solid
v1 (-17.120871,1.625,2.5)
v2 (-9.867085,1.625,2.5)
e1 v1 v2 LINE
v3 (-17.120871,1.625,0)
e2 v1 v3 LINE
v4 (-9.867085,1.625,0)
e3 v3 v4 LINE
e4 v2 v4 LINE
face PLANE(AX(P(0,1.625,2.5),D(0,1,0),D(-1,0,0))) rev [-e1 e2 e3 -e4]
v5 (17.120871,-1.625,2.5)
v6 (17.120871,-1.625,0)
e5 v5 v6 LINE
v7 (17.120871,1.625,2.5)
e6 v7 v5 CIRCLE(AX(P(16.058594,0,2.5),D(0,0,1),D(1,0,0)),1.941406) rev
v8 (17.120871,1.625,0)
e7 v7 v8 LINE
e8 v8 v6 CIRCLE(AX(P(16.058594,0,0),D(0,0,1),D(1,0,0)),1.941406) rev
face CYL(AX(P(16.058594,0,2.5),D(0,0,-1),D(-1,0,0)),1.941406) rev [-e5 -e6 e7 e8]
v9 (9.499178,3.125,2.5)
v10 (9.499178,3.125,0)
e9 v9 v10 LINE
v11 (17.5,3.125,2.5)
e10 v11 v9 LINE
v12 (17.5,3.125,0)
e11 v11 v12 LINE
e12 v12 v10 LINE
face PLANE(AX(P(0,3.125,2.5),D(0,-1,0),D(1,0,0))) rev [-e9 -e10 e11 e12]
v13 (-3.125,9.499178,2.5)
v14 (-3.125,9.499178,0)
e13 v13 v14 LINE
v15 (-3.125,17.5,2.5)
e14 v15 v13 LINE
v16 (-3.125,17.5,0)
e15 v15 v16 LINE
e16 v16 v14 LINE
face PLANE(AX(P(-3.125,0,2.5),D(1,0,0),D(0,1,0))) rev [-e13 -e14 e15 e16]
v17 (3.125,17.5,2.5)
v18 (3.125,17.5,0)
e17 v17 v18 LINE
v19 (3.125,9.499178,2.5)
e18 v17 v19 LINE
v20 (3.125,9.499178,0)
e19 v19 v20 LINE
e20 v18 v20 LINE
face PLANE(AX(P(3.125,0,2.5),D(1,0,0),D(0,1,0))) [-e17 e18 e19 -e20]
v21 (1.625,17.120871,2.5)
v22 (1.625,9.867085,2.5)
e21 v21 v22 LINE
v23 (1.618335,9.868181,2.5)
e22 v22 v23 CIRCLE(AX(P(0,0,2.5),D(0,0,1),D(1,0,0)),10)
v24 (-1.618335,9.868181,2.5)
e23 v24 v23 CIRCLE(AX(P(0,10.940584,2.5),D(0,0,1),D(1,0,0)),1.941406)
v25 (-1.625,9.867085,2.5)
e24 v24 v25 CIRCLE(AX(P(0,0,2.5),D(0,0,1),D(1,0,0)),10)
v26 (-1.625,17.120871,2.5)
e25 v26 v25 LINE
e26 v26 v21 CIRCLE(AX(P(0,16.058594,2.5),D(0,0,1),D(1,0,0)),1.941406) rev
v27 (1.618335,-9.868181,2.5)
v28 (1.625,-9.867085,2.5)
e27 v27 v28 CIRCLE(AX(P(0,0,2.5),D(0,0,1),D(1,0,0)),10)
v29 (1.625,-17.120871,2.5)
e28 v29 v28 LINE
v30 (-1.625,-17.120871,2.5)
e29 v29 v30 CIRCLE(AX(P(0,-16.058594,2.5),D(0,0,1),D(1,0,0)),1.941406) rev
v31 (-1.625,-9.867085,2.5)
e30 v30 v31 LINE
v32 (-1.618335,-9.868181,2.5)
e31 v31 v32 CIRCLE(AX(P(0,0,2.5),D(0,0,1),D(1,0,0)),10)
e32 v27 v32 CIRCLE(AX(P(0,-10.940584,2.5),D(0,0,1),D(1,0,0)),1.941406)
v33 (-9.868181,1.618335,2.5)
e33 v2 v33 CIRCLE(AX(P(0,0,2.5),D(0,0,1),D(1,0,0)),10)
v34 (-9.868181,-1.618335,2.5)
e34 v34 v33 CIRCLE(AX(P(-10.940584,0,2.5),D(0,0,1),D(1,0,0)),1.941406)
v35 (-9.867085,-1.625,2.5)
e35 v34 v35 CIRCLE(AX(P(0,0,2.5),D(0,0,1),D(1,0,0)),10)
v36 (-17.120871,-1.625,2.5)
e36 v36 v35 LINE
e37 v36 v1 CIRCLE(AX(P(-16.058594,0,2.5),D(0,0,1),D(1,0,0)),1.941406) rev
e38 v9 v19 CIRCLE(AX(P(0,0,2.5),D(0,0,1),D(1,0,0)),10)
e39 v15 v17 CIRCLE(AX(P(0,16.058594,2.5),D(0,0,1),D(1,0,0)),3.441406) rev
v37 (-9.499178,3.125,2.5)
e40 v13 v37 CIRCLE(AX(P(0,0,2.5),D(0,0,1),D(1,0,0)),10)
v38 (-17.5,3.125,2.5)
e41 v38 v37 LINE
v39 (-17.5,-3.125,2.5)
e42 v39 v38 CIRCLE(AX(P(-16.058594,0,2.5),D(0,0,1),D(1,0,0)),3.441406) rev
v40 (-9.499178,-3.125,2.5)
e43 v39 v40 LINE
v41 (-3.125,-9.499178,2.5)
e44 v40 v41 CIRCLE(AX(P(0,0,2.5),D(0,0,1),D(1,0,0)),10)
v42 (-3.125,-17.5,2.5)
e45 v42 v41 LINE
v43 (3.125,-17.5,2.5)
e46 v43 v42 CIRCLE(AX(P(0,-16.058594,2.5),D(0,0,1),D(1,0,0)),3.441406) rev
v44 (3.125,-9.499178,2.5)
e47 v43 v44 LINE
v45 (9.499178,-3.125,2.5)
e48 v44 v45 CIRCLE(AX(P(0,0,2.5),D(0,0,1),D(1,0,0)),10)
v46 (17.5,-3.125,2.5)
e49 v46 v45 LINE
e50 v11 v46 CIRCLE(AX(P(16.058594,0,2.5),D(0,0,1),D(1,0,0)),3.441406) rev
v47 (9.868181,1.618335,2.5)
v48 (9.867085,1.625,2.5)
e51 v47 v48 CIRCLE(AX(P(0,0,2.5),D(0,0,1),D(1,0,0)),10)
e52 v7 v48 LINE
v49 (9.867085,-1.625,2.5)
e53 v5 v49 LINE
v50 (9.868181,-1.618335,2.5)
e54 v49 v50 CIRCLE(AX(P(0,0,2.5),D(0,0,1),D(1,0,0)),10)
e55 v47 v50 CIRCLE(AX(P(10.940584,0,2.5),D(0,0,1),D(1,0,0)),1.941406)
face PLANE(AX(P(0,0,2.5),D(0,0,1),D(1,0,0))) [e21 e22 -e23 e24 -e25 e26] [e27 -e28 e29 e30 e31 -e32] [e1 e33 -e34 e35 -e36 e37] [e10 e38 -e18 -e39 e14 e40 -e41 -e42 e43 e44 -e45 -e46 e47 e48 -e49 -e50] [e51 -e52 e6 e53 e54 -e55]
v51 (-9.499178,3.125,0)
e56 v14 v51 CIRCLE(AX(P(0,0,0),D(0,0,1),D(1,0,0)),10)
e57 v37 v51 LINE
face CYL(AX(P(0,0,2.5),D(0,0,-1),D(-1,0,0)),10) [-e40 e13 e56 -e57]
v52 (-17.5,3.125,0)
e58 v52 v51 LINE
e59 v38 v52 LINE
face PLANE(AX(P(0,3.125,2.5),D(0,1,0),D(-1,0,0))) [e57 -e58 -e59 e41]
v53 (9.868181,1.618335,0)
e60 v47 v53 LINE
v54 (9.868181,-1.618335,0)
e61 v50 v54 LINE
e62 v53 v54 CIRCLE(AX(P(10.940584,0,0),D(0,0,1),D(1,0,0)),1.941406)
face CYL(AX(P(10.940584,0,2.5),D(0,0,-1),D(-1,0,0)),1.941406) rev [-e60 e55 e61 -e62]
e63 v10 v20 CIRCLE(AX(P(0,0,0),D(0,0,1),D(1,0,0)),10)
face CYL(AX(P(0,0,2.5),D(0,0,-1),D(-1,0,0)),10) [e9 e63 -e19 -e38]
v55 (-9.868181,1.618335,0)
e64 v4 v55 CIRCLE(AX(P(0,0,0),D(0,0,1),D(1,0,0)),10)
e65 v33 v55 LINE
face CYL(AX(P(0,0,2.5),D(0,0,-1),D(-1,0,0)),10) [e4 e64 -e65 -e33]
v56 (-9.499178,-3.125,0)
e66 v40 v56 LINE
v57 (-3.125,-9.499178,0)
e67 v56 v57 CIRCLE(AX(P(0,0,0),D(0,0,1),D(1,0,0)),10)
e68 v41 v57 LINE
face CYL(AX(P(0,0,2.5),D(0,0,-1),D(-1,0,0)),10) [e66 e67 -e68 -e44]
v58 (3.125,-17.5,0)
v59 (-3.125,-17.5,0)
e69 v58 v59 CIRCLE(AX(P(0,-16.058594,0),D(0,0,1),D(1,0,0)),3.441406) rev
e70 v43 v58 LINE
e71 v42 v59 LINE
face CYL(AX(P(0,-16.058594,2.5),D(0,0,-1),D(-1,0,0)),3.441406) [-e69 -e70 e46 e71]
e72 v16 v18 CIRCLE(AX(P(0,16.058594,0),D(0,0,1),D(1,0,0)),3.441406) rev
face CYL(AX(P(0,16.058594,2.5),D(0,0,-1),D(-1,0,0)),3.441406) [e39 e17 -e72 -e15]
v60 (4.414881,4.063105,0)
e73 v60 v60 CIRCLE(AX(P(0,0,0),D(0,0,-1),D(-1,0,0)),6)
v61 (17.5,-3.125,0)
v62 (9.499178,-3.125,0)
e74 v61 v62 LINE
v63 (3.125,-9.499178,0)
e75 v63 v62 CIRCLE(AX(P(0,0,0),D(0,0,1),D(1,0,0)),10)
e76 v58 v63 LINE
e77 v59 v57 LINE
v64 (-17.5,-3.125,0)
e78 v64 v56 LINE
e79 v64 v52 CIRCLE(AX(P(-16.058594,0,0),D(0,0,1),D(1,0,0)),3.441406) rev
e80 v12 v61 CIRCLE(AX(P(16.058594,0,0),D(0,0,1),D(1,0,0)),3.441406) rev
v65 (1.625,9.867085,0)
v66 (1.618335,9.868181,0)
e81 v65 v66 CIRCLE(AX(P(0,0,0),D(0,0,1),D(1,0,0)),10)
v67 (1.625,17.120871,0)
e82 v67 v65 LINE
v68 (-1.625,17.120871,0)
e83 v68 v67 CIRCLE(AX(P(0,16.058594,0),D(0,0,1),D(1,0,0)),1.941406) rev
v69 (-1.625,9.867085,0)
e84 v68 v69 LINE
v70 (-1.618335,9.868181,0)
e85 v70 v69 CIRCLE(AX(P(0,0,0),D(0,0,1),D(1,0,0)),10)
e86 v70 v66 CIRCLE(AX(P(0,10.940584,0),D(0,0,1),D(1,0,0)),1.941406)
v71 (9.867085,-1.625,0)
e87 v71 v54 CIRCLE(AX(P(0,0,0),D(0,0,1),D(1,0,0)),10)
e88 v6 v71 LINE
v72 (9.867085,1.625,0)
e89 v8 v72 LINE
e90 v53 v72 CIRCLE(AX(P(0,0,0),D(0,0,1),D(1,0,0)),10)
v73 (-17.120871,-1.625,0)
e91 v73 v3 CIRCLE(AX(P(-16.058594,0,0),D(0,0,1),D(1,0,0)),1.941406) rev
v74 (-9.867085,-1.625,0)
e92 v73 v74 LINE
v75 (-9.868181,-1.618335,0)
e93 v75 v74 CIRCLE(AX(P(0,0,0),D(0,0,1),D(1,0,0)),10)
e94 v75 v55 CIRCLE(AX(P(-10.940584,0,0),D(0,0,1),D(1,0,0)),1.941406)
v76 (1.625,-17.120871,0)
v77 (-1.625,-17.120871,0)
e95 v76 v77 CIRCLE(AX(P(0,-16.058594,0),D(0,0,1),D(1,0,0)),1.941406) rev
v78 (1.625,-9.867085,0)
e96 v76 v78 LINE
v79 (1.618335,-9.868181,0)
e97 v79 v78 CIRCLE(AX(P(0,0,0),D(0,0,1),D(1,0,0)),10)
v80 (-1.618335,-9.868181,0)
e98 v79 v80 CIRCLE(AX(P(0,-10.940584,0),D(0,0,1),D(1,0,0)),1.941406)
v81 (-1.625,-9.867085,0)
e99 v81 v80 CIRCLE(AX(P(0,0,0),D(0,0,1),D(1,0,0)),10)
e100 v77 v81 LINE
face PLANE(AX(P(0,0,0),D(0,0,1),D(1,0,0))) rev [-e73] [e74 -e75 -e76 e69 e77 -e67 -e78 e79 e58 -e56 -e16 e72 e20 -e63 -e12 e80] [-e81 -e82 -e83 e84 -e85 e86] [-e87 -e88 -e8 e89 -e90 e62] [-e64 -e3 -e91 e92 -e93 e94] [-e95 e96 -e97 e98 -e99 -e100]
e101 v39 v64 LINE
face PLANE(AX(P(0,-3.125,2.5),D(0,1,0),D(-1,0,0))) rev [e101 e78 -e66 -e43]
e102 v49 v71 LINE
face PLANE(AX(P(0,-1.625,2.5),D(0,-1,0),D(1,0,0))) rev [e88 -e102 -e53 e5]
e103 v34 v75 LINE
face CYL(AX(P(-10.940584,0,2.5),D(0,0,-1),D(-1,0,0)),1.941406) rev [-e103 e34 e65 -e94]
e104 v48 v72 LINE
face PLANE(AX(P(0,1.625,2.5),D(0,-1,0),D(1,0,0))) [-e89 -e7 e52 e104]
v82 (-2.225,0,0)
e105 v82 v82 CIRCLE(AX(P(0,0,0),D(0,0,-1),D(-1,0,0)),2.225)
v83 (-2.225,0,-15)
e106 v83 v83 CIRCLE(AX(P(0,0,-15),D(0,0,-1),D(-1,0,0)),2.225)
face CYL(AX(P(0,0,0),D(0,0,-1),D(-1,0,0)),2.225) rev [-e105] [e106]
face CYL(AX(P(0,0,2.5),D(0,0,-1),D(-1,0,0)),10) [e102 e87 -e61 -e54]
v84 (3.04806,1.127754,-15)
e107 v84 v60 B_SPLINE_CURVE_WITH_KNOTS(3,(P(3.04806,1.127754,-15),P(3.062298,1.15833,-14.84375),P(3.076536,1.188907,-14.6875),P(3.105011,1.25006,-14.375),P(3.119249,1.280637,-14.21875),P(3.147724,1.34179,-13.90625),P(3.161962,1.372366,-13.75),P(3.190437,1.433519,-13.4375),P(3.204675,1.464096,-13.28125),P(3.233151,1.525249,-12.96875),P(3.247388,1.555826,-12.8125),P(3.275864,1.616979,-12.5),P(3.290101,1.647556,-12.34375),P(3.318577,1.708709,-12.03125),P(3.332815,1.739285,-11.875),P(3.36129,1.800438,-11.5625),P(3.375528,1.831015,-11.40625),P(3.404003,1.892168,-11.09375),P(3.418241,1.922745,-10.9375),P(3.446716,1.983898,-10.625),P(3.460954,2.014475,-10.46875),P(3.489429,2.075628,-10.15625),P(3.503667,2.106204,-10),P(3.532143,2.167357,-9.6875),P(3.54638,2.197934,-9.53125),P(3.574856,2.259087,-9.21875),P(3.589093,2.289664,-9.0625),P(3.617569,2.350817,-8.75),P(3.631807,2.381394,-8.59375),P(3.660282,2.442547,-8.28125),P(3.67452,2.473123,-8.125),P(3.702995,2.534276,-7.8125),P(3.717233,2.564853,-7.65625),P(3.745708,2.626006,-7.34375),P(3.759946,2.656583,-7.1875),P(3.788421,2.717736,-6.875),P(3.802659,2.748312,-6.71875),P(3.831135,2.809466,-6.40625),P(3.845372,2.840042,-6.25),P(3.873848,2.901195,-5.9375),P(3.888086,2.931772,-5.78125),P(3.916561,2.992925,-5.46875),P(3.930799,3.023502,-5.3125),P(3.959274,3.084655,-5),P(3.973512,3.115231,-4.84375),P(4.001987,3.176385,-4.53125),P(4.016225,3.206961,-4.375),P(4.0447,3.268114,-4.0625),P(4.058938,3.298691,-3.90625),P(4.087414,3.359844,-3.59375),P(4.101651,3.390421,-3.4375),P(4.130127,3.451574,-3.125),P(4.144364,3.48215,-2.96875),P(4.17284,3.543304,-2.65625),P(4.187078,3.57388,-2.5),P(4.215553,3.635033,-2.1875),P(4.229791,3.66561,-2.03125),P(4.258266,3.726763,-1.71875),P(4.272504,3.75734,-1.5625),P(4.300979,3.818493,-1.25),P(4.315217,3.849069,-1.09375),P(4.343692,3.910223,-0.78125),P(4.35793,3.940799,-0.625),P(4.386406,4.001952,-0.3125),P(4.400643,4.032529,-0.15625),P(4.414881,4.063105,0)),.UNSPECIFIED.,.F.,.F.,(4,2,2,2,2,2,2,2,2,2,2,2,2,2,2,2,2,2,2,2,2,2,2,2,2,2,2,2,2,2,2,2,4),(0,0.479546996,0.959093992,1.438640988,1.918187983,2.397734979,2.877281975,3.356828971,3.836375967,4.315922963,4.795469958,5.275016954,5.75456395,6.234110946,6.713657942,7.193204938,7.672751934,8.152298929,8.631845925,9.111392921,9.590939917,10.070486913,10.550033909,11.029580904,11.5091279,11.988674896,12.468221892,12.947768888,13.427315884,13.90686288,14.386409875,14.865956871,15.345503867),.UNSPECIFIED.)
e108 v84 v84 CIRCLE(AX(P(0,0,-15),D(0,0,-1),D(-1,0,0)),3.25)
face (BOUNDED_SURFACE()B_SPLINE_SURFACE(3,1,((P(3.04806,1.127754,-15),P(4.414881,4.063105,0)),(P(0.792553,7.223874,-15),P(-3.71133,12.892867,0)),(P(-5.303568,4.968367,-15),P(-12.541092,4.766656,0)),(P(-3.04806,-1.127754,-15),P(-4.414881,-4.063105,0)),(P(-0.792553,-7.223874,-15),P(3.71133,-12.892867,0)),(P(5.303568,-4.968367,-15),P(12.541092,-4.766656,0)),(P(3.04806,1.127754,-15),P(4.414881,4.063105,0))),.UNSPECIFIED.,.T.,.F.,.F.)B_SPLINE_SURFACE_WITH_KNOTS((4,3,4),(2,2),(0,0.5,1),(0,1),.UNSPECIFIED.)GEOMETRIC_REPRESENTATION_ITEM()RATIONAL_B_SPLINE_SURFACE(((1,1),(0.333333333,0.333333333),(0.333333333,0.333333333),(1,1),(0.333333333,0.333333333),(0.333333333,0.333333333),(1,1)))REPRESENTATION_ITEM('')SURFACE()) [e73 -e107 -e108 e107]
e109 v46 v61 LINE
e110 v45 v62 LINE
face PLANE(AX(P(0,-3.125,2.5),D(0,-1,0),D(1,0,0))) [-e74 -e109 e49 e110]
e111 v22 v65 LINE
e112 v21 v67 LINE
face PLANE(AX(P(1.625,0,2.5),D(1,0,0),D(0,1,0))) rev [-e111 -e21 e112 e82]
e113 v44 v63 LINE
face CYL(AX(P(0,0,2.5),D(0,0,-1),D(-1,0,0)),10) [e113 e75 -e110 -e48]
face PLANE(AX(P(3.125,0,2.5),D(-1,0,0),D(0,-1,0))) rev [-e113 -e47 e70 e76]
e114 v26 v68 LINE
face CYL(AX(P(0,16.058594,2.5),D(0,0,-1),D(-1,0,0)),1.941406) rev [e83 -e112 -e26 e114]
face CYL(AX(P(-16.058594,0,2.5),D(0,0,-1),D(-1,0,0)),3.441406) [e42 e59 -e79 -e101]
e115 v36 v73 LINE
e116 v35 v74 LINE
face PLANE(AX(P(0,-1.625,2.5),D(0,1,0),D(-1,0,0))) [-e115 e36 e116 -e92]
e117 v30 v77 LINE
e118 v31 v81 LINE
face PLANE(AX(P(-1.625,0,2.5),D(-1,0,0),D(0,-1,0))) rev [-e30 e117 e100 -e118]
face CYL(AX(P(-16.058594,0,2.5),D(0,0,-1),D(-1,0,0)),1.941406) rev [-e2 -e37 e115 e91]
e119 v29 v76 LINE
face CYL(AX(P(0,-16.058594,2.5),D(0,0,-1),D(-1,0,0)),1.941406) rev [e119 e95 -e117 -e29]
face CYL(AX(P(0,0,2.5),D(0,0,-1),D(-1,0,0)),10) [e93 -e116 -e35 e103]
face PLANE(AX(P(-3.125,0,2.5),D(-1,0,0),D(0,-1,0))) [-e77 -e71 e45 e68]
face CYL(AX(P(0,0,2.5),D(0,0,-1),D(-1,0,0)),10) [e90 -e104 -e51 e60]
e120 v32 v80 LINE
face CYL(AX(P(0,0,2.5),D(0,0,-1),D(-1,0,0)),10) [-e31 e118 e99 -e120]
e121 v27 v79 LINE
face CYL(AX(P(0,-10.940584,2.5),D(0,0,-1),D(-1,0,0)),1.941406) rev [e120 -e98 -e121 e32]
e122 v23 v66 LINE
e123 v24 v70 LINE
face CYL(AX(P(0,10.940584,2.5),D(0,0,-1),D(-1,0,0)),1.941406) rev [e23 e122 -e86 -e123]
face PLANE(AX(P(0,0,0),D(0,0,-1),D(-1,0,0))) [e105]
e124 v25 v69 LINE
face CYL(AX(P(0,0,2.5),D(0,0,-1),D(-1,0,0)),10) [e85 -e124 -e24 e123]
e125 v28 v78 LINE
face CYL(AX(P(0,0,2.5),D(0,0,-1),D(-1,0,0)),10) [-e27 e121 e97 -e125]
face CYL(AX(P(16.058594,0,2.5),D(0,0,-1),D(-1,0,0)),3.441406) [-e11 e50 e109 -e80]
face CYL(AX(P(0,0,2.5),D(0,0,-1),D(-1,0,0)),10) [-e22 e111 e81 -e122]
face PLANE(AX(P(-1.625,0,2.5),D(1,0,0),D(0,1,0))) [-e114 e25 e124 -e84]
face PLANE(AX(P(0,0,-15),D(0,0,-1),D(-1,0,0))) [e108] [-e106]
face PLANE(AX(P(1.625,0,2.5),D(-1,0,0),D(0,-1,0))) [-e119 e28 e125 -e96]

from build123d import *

# Parameters (mm, degrees)
BOSS_EXTRUDE1_DEPTH = 2.5
SKETCH16_R          = 2.225
CUT_EXTRUDE2_DEPTH  = 15


with BuildPart() as part:
    # Sketch1 → Boss-Extrude1 (new body)
    with BuildSketch(Plane.XY):
        with BuildLine():
            Line((3.125, -17.5), (3.125, -9.499177596))
            ThreePointArc((3.125, -9.499177596), (7.071067812, -7.071067812), (9.499177596, -3.125))
            Line((9.499177596, -3.125), (17.5, -3.125))
            ThreePointArc((17.5, -3.125), (19.5, 0), (17.5, 3.125))
            Line((17.5, 3.125), (9.499177596, 3.125))
            ThreePointArc((9.499177596, 3.125), (7.071067812, 7.071067812), (3.125, 9.499177596))
            Line((3.125, 9.499177596), (3.125, 17.5))
            ThreePointArc((3.125, 17.5), (0, 19.5), (-3.125, 17.5))
            Line((-3.125, 17.5), (-3.125, 9.499177596))
            ThreePointArc((-3.125, 9.499177596), (-7.071067812, 7.071067812), (-9.499177596, 3.125))
            Line((-9.499177596, 3.125), (-17.5, 3.125))
            ThreePointArc((-17.5, 3.125), (-19.5, 0), (-17.5, -3.125))
            Line((-17.5, -3.125), (-9.499177596, -3.125))
            ThreePointArc((-9.499177596, -3.125), (-7.071067812, -7.071067812), (-3.125, -9.499177596))
            Line((-3.125, -9.499177596), (-3.125, -17.5))
            ThreePointArc((-3.125, -17.5), (0, -19.5), (3.125, -17.5))
        make_face()
        with BuildLine():
            ThreePointArc((-9.868180698, -1.618335477), (-9.86763363, -1.621667831), (-9.867085436, -1.625))
            Line((-9.867085436, -1.625), (-9.878306468, -1.625))
            Line((-9.878306468, -1.625), (-17.120871128, -1.625))
            ThreePointArc((-17.120871128, -1.625), (-18, 0), (-17.120871128, 1.625))
            Line((-17.120871128, 1.625), (-9.878306468, 1.625))
            Line((-9.878306468, 1.625), (-9.867085436, 1.625))
            ThreePointArc((-9.867085436, 1.625), (-9.86763363, 1.621667831), (-9.868180698, 1.618335477))
            ThreePointArc((-9.868180698, 1.618335477), (-8.999177596, 0), (-9.868180698, -1.618335477))
        make_face(mode=Mode.SUBTRACT)
        with BuildLine():
            ThreePointArc((-1.618335477, -9.868180698), (0, -8.999177596), (1.618335477, -9.868180698))
            ThreePointArc((1.618335477, -9.868180698), (1.621667831, -9.86763363), (1.625, -9.867085436))
            Line((1.625, -9.867085436), (1.625, -9.878306468))
            Line((1.625, -9.878306468), (1.625, -17.120871128))
            ThreePointArc((1.625, -17.120871128), (0, -18), (-1.625, -17.120871128))
            Line((-1.625, -17.120871128), (-1.625, -9.878306468))
            Line((-1.625, -9.878306468), (-1.625, -9.867085436))
            ThreePointArc((-1.625, -9.867085436), (-1.621667831, -9.86763363), (-1.618335477, -9.868180698))
        make_face(mode=Mode.SUBTRACT)
        with BuildLine():
            Line((1.625, 9.878306468), (1.625, 9.867085436))
            ThreePointArc((1.625, 9.867085436), (1.621667831, 9.86763363), (1.618335477, 9.868180698))
            ThreePointArc((1.618335477, 9.868180698), (0, 8.999177596), (-1.618335477, 9.868180698))
            ThreePointArc((-1.618335477, 9.868180698), (-1.621667831, 9.86763363), (-1.625, 9.867085436))
            Line((-1.625, 9.867085436), (-1.625, 9.878306468))
            Line((-1.625, 9.878306468), (-1.625, 17.120871128))
            ThreePointArc((-1.625, 17.120871128), (0, 18), (1.625, 17.120871128))
            Line((1.625, 17.120871128), (1.625, 9.878306468))
        make_face(mode=Mode.SUBTRACT)
        with BuildLine():
            ThreePointArc((9.868180698, 1.618335477), (9.86763363, 1.621667831), (9.867085436, 1.625))
            Line((9.867085436, 1.625), (9.878306468, 1.625))
            Line((9.878306468, 1.625), (17.120871128, 1.625))
            ThreePointArc((17.120871128, 1.625), (18, 0), (17.120871128, -1.625))
            Line((17.120871128, -1.625), (9.878306468, -1.625))
            Line((9.878306468, -1.625), (9.867085436, -1.625))
            ThreePointArc((9.867085436, -1.625), (9.86763363, -1.621667831), (9.868180698, -1.618335477))
            ThreePointArc((9.868180698, -1.618335477), (8.999177596, 0), (9.868180698, 1.618335477))
        make_face(mode=Mode.SUBTRACT)
    extrude(amount=BOSS_EXTRUDE1_DEPTH)

    # Loft2: read off the stored shape, not the designer's step
    # Loft2: loft between two sections, ruled curve by curve
    loft2_from = [
        Edge.make_bspline([(3.048060313, 1.127753665, -15), (0.792552983, 7.223874291, -15), (-5.303567643, 4.968366961, -15), (-3.048060313, -1.127753665, -15), (-0.792552983, -7.223874291, -15), (5.303567643, -4.968366961, -15), (3.048060313, 1.127753665, -15)], [0, 0, 0, 0, 0.5, 0.5, 0.5, 1, 1, 1, 1], 3, [1, 0.333333333, 0.333333333, 1, 0.333333333, 0.333333333, 1]),
    ]
    loft2_to = [
        Edge.make_bspline([(4.41488096, 4.063105476, 0), (-3.711329991, 12.892867396, 0), (-12.541091911, 4.766656445, 0), (-4.41488096, -4.063105476, 0), (3.711329991, -12.892867396, 0), (12.541091911, -4.766656445, 0), (4.41488096, 4.063105476, 0)], [0, 0, 0, 0, 0.5, 0.5, 0.5, 1, 1, 1, 1], 3, [1, 0.333333333, 0.333333333, 1, 0.333333333, 0.333333333, 1]),
    ]
    loft2 = Solid(Shell([*[Face.make_surface_from_curves(loft2_from[k], loft2_to[k]) for k in range(1)], Face(Wire(loft2_from)), Face(Wire(loft2_to))]))
    add(loft2)

    # Sketch16 → Cut-Extrude2 (cut)
    with BuildSketch(Plane(origin=(0, 0, -15), x_dir=(-1, 0, 0), z_dir=(0, 0, -1))):
        Circle(SKETCH16_R)
    extrude(amount=-CUT_EXTRUDE2_DEPTH, mode=Mode.SUBTRACT)


solid = part.part
